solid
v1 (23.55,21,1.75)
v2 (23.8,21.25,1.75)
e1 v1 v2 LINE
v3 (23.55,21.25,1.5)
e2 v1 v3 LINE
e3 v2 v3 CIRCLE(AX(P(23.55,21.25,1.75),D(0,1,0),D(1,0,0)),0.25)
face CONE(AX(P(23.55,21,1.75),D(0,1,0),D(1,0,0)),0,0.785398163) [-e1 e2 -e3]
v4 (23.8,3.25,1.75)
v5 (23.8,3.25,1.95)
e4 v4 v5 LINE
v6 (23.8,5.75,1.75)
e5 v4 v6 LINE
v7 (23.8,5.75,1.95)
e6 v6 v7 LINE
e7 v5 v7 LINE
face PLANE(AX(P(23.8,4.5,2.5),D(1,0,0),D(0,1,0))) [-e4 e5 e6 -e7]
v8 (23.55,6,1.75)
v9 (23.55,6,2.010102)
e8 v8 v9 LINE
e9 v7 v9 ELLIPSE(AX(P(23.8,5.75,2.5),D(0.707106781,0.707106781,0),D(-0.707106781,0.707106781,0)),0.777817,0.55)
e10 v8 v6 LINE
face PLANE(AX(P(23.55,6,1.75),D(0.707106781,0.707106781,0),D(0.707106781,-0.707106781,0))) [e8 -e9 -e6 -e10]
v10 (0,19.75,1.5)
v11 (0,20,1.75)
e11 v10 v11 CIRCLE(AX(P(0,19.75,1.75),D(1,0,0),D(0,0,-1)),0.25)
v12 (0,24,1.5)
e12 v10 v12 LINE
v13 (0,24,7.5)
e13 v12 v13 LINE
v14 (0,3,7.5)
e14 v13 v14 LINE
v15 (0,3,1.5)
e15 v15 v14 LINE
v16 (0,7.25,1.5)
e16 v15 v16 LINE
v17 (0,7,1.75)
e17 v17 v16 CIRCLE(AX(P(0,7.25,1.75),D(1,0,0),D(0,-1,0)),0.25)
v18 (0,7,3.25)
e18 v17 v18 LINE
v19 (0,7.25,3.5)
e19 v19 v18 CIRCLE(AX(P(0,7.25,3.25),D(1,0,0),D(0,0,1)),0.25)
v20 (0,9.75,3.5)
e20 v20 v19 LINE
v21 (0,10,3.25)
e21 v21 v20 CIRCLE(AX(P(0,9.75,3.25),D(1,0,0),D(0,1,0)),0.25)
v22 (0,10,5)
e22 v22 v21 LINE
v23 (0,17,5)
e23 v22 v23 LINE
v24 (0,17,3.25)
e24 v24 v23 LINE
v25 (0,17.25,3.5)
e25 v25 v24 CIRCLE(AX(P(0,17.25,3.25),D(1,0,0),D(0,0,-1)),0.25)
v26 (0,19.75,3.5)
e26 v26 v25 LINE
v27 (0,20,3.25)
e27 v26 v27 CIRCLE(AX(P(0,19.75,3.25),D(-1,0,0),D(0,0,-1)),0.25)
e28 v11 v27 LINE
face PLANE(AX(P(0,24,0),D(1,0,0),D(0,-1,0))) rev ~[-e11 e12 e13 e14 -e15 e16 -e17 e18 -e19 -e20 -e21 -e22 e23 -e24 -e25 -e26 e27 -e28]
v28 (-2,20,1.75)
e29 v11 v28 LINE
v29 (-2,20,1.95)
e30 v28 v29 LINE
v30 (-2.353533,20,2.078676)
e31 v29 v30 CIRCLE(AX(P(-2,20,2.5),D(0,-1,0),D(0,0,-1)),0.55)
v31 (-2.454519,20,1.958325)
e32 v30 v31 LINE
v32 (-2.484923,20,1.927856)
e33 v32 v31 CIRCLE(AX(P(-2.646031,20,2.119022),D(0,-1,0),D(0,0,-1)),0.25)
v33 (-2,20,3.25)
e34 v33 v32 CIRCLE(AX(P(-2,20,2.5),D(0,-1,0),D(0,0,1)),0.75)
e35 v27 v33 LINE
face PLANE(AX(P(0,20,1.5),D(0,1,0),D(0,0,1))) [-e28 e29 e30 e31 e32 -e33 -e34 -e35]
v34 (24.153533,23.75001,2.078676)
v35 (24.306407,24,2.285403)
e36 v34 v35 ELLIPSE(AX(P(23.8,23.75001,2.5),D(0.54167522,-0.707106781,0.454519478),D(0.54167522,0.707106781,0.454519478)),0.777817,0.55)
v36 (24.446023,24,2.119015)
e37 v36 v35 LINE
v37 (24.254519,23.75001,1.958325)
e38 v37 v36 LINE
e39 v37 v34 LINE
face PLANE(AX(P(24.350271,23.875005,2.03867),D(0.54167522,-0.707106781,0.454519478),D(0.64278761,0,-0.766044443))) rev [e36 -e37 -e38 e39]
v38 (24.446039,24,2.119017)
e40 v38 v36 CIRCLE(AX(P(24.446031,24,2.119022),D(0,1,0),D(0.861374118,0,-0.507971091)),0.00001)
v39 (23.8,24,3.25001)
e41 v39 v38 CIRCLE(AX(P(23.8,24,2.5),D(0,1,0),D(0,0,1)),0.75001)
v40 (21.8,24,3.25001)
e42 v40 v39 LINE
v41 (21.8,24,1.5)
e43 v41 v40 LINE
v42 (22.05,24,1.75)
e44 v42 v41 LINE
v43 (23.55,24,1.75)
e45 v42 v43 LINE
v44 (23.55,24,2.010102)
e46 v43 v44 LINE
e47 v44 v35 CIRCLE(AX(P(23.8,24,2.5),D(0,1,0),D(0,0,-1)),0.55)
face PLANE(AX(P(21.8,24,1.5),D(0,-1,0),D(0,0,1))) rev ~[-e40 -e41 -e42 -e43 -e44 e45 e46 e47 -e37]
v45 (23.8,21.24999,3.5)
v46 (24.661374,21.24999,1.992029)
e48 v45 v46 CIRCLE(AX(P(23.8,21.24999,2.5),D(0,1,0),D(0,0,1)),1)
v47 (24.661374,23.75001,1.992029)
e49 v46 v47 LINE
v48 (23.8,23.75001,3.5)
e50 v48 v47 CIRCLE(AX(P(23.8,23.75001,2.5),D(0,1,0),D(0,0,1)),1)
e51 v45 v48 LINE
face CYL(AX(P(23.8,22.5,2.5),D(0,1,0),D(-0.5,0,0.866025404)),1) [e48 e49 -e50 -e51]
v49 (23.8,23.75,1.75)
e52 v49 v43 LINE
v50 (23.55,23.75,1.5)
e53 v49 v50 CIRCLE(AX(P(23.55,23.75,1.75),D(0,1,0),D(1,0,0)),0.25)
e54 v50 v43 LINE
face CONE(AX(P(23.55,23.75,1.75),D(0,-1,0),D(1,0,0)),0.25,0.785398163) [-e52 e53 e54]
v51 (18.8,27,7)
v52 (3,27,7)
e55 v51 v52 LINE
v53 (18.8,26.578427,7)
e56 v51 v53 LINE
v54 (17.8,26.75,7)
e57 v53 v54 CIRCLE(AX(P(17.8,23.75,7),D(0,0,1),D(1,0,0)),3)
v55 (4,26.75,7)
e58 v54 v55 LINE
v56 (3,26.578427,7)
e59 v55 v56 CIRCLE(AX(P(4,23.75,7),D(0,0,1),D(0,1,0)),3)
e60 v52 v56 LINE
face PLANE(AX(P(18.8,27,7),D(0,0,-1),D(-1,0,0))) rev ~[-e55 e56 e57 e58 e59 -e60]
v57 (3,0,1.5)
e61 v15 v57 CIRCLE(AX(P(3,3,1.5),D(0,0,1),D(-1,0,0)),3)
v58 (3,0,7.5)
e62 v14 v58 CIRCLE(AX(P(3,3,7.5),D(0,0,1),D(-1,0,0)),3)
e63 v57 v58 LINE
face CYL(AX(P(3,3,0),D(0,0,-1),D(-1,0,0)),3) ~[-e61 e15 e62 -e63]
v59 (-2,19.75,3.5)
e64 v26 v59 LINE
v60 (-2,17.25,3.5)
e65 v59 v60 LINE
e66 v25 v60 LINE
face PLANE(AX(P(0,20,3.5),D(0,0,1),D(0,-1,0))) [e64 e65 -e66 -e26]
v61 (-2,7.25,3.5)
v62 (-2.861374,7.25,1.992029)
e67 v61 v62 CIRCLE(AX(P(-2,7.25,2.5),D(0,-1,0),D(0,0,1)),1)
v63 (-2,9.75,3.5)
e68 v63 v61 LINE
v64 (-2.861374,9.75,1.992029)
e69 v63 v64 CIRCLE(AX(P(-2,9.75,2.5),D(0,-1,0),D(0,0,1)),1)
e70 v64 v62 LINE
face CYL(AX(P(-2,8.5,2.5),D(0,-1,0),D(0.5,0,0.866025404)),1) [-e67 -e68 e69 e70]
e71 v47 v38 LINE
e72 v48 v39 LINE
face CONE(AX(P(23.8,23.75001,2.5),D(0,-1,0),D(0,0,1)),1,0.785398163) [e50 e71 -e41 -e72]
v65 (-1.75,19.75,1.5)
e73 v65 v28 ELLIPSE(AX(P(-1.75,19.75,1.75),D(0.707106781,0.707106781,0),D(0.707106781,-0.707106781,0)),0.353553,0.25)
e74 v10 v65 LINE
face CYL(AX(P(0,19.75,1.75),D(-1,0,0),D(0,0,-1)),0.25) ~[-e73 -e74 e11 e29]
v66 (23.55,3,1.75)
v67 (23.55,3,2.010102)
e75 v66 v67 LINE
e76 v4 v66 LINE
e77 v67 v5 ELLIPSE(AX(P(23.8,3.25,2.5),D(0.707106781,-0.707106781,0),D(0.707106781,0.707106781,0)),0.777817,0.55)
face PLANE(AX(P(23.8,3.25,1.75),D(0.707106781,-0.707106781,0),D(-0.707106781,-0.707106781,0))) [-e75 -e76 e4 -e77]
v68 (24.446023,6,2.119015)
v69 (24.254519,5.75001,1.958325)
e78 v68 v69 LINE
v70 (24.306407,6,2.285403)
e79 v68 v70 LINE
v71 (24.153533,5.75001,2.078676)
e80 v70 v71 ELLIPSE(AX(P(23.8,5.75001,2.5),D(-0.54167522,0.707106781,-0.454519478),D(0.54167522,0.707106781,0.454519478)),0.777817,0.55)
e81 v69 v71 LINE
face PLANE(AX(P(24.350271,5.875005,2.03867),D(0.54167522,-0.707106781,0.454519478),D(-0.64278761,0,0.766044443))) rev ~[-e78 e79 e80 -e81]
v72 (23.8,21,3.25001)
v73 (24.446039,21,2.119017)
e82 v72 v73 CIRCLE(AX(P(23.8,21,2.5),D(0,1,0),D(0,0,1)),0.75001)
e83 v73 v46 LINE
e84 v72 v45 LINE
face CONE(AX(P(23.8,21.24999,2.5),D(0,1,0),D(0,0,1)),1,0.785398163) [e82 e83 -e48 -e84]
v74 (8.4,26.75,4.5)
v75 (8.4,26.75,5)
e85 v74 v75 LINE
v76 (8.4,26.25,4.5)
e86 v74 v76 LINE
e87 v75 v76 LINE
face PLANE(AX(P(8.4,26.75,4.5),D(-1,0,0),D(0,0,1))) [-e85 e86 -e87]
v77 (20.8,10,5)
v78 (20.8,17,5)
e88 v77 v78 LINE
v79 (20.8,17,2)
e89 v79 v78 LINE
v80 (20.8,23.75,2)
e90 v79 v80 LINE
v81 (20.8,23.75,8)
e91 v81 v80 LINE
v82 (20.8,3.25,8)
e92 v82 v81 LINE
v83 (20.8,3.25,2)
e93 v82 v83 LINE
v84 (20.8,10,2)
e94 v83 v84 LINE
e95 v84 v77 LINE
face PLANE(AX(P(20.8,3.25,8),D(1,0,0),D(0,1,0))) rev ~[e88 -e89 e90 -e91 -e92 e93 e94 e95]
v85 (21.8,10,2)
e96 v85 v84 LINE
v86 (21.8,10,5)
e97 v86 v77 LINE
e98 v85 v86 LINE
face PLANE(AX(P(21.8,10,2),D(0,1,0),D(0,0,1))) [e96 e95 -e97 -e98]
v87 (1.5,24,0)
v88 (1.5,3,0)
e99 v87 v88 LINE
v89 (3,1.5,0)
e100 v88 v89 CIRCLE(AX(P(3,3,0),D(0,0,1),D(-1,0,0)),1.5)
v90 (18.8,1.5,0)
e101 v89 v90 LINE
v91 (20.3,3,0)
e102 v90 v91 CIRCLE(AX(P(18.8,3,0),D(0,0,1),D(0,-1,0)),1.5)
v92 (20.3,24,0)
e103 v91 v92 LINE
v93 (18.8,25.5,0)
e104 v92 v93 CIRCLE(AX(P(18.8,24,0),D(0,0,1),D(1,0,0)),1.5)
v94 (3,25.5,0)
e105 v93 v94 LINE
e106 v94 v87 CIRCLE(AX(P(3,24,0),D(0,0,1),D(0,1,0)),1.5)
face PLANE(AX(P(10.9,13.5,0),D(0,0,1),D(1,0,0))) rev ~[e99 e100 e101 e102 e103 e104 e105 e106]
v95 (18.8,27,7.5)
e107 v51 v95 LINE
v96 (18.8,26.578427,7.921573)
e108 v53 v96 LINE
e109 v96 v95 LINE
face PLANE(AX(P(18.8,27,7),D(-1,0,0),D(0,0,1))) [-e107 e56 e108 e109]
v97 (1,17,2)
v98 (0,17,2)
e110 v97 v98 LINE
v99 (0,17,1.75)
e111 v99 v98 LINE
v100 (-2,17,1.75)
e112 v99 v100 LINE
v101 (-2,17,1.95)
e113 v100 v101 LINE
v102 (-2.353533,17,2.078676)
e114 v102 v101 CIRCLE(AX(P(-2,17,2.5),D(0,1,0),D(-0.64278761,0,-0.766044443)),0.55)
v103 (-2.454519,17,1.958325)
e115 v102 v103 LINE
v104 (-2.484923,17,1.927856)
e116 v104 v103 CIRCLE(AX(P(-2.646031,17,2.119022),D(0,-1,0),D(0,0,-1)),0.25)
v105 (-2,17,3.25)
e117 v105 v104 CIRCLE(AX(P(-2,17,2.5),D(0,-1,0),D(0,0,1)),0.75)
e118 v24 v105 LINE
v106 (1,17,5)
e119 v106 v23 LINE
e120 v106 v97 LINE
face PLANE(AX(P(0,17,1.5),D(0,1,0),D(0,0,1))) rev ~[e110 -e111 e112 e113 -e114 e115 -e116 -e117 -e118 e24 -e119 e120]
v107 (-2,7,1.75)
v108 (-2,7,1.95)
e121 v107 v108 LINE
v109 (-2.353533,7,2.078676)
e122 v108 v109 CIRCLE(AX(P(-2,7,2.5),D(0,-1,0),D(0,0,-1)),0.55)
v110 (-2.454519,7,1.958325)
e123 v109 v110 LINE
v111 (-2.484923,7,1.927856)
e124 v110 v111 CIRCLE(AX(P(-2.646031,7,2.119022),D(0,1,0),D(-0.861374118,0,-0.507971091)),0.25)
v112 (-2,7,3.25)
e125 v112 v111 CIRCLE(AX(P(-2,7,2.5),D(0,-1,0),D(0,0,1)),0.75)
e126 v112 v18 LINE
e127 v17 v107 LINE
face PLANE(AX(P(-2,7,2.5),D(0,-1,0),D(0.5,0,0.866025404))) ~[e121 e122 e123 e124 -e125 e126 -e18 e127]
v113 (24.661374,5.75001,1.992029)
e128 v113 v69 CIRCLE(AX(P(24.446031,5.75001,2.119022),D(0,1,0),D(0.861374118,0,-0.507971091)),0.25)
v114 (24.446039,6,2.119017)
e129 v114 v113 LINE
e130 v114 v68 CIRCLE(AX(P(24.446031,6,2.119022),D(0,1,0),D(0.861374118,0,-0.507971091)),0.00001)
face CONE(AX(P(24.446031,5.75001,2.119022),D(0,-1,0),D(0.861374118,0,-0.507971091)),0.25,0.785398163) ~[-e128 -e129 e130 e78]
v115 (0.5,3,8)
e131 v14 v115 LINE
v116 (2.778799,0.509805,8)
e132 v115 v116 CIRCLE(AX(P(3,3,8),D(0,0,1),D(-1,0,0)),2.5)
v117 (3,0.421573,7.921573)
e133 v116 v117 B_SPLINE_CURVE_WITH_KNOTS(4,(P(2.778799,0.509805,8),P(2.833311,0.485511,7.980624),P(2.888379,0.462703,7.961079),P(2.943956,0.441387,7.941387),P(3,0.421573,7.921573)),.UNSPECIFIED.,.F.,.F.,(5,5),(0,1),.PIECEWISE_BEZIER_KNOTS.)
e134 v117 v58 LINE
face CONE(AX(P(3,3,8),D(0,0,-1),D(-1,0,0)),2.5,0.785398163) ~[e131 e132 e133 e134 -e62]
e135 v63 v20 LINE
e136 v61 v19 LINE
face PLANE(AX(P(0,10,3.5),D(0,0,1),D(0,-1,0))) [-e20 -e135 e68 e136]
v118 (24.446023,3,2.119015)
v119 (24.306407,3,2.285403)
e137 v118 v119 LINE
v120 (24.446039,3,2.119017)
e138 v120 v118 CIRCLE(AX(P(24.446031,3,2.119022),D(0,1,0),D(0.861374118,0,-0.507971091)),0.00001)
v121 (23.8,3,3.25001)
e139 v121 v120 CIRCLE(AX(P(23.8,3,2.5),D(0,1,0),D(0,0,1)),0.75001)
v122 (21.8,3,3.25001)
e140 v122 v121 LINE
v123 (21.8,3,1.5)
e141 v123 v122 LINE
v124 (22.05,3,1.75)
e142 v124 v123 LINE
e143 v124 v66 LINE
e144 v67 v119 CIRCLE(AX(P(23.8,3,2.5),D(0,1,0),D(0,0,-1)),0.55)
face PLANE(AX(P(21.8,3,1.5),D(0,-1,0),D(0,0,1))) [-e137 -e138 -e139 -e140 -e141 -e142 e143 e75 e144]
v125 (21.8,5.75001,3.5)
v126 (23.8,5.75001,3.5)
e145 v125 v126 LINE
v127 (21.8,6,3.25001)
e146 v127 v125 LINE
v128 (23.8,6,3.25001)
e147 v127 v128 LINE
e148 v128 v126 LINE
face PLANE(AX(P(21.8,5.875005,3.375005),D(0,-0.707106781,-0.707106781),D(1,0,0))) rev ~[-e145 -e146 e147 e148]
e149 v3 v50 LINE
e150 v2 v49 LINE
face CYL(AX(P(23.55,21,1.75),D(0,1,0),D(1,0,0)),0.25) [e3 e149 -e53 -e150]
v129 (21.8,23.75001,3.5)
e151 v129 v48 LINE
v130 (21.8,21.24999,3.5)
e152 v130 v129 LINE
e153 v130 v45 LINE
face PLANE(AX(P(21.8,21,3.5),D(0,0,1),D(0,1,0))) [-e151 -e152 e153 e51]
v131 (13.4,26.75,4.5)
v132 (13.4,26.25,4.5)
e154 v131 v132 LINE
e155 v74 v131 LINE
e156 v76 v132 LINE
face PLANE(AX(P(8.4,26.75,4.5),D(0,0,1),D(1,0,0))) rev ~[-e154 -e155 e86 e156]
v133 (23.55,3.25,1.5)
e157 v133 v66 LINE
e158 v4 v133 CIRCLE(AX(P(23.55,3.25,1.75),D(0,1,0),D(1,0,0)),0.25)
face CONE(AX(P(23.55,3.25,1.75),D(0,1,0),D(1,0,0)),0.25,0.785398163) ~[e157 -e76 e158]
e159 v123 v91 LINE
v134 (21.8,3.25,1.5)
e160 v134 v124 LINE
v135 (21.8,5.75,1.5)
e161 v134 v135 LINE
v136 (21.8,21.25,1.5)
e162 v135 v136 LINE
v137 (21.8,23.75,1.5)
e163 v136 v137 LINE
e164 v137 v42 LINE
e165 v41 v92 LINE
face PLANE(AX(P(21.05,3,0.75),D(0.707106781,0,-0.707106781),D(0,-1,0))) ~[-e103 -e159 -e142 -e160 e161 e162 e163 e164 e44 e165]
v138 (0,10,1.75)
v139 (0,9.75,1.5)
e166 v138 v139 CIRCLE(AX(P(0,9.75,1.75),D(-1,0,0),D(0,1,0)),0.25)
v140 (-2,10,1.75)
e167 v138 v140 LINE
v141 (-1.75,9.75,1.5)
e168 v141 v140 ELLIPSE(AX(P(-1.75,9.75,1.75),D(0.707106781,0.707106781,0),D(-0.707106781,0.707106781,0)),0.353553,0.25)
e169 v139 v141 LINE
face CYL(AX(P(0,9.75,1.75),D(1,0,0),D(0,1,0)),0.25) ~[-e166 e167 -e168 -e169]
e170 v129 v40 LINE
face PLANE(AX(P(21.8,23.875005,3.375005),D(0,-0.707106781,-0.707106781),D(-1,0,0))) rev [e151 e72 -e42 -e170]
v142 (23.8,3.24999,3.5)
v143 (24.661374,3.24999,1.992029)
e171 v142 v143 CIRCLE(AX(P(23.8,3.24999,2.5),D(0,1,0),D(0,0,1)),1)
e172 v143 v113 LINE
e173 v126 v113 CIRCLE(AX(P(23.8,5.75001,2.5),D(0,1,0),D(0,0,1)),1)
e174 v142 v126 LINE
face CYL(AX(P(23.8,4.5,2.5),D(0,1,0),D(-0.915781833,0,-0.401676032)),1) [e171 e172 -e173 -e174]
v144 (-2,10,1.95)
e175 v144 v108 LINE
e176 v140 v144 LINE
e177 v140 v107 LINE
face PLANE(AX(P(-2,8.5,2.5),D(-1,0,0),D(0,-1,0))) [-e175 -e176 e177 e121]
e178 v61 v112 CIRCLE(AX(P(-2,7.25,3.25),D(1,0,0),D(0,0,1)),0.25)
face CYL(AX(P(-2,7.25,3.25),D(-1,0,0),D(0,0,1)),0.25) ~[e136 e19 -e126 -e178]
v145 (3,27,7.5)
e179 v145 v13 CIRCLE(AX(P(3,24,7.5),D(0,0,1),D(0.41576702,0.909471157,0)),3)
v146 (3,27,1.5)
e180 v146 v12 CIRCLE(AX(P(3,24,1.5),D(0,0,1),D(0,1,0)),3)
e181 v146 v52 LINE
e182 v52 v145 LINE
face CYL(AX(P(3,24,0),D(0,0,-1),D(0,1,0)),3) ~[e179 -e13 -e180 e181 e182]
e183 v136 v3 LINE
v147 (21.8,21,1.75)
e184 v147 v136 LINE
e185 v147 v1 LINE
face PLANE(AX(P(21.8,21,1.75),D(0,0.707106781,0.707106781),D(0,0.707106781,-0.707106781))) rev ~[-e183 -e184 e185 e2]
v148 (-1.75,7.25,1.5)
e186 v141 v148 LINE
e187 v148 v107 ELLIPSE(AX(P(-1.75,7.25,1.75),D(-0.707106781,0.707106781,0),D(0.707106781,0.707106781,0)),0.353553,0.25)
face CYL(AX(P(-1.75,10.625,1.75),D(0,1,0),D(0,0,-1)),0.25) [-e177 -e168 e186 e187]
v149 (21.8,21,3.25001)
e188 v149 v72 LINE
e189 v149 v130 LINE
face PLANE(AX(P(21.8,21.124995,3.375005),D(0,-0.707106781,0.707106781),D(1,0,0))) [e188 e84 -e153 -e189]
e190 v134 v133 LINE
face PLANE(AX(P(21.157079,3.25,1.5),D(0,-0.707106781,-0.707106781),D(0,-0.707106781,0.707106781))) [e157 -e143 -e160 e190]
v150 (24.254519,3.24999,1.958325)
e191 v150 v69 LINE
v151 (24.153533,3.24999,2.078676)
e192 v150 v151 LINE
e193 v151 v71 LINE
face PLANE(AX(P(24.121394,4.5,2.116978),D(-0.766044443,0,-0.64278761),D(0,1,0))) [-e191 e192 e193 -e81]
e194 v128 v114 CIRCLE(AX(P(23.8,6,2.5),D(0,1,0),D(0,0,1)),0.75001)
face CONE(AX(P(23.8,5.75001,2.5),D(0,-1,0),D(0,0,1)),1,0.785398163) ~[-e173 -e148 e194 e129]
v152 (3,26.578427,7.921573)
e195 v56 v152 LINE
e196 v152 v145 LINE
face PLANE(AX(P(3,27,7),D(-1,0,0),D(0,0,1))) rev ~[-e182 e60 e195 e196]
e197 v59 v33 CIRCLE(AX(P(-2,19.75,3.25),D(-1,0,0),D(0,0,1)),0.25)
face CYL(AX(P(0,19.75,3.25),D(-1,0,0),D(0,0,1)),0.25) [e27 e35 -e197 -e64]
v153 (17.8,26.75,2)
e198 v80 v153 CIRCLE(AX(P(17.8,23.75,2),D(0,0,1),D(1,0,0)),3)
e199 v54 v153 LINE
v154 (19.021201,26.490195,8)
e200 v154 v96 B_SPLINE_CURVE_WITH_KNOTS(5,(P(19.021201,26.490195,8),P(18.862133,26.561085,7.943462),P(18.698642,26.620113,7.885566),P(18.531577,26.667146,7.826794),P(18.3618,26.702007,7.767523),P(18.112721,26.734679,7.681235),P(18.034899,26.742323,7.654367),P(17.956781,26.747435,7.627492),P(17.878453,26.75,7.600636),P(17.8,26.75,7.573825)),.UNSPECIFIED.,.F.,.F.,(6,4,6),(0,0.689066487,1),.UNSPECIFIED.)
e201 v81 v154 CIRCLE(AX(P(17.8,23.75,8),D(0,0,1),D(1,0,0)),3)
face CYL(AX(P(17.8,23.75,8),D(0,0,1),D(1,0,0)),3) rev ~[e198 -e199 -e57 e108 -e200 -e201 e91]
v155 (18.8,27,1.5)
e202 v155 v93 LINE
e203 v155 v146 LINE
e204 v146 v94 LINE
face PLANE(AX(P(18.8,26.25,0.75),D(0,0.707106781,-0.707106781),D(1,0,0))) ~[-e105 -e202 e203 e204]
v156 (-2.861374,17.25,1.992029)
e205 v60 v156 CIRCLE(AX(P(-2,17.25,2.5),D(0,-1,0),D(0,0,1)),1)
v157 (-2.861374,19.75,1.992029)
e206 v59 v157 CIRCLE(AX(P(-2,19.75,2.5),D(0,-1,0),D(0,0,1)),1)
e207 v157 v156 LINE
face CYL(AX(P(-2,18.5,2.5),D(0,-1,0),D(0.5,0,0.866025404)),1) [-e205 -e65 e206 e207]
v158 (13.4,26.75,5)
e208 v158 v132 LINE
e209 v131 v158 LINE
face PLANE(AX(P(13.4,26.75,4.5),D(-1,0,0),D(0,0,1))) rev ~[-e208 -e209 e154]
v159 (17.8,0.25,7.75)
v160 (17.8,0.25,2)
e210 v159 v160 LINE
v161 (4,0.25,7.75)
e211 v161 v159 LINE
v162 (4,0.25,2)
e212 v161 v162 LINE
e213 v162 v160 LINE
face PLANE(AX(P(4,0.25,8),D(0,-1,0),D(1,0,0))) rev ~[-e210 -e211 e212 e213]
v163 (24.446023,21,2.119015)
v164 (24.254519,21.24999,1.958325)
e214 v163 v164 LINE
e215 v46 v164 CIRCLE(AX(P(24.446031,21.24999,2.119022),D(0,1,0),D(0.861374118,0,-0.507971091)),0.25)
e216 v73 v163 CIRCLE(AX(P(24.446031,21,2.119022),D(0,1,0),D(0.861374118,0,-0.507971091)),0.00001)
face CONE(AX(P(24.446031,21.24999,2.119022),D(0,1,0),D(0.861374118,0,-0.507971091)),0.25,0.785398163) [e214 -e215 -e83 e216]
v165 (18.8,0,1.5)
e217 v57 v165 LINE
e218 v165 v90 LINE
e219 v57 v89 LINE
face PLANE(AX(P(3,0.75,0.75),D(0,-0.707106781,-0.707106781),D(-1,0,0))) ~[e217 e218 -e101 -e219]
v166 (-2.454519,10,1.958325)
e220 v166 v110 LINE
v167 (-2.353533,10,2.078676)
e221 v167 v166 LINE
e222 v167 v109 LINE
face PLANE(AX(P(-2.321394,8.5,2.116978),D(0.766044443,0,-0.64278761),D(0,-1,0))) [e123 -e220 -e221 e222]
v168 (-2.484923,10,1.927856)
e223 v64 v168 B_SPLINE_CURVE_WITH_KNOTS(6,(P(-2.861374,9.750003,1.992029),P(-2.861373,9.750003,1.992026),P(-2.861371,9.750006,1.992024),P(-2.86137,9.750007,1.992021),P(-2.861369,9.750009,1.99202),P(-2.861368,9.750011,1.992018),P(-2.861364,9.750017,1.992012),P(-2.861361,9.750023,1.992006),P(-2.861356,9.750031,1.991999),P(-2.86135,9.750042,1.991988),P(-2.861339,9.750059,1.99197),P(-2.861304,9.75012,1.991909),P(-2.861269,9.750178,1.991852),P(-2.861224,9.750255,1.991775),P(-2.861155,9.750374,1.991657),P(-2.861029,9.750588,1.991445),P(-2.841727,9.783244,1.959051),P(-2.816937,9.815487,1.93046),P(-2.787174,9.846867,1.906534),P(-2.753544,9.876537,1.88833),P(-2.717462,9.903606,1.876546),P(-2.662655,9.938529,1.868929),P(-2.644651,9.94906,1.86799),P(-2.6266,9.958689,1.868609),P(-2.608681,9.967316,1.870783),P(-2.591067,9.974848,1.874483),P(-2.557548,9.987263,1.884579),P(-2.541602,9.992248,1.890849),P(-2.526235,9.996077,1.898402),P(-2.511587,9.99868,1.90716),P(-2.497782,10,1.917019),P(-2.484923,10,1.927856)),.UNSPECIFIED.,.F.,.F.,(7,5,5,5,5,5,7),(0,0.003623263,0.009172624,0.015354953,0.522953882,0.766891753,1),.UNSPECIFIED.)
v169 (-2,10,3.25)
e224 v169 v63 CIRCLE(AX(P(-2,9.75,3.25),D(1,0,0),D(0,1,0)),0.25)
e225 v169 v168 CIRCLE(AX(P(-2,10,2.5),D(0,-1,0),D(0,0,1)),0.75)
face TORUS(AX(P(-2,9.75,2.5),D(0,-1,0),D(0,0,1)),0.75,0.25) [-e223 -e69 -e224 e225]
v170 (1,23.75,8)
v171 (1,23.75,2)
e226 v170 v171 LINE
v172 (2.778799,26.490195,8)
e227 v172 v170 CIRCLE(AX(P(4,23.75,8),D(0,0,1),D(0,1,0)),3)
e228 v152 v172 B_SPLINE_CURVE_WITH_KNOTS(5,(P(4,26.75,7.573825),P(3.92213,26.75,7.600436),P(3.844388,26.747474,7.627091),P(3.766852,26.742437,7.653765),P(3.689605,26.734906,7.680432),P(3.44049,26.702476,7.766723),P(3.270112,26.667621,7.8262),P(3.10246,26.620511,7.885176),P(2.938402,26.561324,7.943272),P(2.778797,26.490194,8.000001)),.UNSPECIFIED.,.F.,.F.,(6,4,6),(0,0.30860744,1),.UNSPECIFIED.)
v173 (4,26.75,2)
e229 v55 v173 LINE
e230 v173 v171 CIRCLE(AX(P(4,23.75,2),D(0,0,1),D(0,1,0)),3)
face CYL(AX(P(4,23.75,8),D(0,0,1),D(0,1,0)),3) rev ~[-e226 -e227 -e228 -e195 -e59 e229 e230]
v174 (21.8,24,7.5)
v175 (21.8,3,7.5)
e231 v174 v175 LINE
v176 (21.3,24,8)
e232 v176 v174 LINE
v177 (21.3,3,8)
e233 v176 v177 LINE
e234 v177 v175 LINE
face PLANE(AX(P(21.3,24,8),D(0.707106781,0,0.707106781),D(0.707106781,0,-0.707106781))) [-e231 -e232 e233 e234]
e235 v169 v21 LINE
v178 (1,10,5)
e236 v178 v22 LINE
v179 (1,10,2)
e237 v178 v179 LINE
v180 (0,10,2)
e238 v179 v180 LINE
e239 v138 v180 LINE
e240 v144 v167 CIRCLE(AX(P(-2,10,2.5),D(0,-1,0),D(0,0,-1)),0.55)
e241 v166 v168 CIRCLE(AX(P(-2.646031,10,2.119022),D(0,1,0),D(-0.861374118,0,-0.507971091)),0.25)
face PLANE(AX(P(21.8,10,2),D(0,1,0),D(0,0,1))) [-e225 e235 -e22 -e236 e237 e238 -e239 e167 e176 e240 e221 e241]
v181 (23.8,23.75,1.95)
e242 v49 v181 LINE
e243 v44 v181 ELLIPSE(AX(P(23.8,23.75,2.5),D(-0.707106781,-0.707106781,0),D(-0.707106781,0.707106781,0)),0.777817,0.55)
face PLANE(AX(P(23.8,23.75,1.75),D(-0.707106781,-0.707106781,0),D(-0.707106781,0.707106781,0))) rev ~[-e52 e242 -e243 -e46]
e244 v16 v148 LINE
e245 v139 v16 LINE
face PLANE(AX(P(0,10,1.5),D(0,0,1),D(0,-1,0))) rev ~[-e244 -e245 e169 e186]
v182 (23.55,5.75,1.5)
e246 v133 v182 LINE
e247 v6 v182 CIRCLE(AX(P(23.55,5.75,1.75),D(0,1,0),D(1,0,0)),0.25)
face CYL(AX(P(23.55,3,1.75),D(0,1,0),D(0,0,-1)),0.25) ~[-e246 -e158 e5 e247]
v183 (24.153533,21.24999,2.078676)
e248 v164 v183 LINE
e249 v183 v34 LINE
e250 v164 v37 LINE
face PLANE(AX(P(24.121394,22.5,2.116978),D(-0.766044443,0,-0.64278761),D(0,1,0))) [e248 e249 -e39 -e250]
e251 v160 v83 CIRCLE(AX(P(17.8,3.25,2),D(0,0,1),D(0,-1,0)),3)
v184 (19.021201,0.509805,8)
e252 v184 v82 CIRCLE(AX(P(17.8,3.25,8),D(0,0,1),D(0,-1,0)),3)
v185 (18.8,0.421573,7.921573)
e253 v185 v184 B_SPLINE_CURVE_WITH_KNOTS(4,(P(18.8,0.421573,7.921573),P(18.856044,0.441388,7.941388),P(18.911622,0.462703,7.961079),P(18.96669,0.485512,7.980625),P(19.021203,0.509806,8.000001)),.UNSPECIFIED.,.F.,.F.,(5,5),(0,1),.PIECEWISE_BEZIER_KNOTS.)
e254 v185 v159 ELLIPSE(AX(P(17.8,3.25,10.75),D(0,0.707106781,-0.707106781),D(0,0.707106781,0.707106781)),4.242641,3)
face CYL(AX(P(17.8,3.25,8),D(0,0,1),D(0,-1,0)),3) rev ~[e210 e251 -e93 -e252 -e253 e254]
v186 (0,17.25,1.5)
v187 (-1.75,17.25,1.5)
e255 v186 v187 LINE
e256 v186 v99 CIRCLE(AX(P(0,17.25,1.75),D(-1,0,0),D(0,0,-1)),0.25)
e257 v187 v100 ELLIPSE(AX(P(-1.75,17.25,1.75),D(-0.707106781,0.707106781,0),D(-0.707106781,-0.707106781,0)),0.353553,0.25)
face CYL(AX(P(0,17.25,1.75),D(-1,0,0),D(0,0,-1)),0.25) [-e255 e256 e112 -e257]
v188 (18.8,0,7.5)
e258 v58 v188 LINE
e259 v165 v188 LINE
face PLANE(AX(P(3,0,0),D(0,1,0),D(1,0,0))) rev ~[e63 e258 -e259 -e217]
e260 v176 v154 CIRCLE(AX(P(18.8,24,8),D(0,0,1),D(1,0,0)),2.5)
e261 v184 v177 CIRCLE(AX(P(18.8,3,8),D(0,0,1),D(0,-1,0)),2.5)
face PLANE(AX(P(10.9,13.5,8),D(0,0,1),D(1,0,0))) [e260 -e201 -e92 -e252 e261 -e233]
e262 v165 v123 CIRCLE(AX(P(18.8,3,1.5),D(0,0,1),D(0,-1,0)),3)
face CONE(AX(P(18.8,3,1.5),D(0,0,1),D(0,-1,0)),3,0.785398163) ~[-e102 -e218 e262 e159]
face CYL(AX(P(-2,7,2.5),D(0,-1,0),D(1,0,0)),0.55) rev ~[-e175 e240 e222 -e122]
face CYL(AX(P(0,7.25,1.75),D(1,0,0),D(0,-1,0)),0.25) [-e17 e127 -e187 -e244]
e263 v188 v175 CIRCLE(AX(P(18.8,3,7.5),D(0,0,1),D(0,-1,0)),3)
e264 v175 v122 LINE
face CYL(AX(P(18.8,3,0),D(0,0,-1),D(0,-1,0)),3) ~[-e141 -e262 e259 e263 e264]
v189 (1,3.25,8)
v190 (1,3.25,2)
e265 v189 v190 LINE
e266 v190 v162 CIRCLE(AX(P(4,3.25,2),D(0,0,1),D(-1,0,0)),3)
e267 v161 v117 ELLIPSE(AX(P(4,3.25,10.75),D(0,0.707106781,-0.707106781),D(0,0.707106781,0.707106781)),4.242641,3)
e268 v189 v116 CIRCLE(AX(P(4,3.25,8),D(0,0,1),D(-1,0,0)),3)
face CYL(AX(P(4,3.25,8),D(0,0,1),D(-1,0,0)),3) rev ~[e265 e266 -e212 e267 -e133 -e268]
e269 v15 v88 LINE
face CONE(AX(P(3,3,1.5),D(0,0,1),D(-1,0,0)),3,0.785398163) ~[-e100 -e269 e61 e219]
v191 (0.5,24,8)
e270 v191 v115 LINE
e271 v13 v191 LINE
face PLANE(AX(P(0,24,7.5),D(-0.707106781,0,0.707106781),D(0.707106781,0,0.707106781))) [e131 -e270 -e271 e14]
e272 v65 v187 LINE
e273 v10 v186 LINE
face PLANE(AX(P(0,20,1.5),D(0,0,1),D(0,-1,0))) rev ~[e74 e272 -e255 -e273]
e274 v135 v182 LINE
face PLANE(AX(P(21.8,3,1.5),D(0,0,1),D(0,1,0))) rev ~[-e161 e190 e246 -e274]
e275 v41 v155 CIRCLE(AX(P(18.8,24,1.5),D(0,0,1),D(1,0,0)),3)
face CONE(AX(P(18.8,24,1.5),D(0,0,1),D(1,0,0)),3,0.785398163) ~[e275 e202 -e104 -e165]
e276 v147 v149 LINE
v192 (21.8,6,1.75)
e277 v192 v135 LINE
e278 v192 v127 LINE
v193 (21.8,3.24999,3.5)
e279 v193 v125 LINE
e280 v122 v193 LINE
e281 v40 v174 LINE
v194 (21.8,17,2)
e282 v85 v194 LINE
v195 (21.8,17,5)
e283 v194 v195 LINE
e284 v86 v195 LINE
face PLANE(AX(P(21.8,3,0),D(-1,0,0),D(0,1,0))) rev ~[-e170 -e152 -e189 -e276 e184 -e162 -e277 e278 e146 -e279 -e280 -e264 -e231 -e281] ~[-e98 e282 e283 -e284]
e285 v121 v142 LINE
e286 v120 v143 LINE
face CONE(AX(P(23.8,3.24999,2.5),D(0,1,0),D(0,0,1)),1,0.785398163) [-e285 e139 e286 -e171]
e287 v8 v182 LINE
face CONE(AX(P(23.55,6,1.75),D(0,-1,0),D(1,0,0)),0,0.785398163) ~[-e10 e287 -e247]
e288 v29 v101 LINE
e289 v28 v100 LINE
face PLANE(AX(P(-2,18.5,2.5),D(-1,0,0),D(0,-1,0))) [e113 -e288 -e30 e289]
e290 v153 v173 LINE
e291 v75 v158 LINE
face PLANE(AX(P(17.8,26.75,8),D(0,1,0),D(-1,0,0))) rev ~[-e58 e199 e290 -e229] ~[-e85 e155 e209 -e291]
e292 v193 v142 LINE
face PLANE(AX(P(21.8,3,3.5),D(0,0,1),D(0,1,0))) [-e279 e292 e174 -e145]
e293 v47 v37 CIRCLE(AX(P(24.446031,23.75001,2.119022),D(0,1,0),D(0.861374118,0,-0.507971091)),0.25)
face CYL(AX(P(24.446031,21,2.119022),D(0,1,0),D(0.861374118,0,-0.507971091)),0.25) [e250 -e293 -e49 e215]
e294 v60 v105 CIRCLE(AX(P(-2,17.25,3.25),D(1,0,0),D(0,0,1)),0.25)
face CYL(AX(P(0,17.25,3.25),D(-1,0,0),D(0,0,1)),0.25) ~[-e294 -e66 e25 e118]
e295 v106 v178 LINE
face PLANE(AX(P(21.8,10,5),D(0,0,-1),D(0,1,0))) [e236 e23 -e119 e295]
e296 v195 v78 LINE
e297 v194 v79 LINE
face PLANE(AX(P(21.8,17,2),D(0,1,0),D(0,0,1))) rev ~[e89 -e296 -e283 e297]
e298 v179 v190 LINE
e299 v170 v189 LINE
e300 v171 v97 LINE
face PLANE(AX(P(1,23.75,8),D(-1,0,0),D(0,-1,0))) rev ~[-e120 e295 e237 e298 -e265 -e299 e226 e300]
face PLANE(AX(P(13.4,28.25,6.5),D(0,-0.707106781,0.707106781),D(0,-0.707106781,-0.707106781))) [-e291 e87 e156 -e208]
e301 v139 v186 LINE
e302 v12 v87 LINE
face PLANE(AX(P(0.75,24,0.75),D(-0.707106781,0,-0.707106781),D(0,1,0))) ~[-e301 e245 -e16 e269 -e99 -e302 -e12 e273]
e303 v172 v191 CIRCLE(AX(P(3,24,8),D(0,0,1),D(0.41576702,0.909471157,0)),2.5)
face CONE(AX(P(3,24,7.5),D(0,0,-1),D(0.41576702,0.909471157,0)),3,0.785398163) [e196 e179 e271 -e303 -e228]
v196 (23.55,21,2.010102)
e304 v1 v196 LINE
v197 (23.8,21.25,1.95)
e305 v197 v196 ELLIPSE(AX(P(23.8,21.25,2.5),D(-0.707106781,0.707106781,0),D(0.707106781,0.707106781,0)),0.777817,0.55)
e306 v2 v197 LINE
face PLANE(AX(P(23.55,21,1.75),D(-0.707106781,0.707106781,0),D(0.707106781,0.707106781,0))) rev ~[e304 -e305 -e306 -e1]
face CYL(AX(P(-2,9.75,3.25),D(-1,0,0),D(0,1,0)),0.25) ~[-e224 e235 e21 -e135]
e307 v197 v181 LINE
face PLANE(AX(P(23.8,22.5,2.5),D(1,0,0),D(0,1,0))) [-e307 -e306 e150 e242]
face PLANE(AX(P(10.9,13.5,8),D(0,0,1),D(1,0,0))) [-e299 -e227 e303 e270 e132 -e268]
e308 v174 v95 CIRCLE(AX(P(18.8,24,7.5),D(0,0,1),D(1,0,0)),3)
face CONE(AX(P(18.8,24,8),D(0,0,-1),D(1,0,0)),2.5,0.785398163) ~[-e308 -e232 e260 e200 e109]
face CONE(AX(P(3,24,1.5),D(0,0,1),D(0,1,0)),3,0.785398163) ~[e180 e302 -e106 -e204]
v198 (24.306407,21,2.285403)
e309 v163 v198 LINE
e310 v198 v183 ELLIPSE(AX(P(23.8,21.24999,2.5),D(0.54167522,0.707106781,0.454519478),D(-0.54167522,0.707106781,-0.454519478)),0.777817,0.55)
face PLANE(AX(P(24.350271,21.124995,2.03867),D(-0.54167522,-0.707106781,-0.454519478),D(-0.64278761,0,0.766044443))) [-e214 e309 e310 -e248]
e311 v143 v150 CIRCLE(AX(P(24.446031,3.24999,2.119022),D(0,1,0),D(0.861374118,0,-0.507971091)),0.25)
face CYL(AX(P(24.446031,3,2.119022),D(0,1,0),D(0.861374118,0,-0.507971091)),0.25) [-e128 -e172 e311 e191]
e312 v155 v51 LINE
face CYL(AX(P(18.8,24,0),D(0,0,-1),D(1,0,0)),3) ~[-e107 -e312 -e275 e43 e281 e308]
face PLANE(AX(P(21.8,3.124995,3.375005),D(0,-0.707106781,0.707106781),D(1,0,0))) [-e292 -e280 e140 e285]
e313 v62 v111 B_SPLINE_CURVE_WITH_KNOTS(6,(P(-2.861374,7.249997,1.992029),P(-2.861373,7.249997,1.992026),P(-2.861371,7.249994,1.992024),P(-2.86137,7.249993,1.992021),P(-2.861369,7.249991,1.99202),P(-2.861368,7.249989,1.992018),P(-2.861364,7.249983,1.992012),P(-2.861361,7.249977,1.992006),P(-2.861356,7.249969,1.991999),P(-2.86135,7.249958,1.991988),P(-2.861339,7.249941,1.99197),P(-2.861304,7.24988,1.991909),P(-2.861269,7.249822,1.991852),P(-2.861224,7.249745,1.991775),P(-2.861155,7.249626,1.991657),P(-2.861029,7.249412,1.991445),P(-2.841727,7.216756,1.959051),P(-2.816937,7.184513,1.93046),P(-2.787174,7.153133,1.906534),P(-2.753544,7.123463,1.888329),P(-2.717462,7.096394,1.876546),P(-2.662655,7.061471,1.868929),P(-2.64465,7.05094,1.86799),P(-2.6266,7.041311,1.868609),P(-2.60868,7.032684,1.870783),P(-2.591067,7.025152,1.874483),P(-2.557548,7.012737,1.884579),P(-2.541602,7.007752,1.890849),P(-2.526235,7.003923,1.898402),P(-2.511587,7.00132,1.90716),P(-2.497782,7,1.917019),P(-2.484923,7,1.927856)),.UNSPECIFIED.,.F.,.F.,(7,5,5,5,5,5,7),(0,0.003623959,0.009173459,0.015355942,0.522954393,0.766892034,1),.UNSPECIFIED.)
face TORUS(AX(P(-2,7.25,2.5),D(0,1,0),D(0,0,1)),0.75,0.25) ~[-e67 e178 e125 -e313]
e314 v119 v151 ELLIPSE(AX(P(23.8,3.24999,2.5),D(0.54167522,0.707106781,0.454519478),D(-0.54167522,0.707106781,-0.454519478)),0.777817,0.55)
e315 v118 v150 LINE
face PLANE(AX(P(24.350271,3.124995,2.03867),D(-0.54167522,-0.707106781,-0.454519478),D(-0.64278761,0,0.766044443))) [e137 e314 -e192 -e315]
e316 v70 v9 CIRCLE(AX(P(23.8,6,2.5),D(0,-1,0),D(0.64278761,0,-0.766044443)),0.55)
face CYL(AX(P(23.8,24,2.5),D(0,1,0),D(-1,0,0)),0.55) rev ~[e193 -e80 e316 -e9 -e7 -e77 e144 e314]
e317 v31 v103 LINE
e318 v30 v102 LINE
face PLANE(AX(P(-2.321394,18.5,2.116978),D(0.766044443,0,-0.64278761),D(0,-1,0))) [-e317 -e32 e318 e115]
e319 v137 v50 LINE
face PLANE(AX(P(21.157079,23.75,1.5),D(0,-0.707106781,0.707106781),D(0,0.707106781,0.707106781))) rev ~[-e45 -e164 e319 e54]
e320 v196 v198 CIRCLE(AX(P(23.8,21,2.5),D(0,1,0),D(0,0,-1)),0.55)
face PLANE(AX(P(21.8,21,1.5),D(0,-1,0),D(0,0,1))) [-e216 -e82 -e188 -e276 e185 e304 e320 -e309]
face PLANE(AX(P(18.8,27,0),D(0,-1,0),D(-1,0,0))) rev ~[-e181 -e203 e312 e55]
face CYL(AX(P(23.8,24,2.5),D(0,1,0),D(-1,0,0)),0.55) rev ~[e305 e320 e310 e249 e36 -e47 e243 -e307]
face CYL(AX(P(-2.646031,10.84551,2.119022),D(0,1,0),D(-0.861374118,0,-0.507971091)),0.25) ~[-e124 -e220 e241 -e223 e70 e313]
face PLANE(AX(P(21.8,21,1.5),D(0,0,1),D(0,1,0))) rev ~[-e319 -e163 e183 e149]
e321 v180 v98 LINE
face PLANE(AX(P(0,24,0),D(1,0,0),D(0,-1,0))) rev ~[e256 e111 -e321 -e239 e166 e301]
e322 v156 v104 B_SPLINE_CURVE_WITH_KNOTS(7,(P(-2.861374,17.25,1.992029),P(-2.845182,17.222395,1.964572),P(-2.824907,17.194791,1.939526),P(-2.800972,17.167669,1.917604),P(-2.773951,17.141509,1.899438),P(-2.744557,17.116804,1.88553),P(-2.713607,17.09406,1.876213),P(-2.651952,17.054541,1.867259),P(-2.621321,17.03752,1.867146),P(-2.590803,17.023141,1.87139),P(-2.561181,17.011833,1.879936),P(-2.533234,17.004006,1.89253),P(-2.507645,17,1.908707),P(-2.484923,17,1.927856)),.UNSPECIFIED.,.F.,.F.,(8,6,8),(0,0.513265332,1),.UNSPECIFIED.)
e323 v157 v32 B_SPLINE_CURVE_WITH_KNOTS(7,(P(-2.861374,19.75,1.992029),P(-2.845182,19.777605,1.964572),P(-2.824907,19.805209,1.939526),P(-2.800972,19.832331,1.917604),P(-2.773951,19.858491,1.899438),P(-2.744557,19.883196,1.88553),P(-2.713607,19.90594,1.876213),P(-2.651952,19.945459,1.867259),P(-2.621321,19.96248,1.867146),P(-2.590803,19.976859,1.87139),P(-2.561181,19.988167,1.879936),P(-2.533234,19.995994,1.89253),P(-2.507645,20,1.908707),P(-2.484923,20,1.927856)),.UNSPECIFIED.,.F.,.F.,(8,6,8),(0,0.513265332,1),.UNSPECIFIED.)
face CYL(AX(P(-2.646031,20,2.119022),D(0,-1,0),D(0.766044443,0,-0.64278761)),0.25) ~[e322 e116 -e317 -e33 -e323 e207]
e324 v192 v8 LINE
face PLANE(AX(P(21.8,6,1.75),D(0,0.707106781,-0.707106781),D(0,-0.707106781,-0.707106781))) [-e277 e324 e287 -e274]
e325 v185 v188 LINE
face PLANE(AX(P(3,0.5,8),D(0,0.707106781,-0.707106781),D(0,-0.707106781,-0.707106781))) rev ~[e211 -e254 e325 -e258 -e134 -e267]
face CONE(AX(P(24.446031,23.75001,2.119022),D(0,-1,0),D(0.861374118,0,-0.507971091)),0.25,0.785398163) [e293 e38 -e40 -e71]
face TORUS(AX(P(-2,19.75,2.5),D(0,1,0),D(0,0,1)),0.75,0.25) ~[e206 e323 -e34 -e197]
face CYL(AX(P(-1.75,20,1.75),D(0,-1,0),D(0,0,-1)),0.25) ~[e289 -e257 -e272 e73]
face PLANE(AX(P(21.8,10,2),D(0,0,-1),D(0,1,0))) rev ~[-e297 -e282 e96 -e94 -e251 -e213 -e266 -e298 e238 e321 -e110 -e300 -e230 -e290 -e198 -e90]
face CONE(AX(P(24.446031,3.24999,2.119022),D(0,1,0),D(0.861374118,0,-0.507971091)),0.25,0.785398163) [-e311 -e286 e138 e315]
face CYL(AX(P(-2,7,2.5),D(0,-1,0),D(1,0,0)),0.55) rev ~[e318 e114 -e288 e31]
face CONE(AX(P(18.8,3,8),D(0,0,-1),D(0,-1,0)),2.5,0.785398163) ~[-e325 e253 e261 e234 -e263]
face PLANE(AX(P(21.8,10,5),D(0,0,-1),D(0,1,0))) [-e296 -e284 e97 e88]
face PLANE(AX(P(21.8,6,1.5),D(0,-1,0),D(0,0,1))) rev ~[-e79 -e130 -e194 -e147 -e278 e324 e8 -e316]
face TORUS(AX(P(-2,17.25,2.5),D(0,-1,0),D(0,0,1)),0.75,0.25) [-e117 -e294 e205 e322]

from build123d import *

# Parameters (mm, degrees)
F1_DEPTH       = 8
F3_DEPTH       = 6
F4_W           = 7
F4_H           = 3
F5_DEPTH       = 21.8
F6_W           = 15.8
F6_H           = 1
F7_DEPTH       = 3
F8_SIZE        = 1.5
F9_T1_DEPTH    = 21
F9_T3_DEPTH    = 15.8
F9_T6_ANGLE    = 114.5676286299
F9_T8_ANGLE    = 114.5676286299
F9_T10_ANGLE   = 90
F9_T12_ANGLE   = 90
F10_W          = 5
F10_H          = 2
F11_DEPTH      = 0.5
F12_T4_DEPTH   = 5
F13_W          = 3
F13_H          = 2
F14_DEPTH      = 2
F15_W          = 3
F15_H          = 1
F16_ANGLE_BACK = 113.6829972449
F16_ANGLE      = 253.6829972449
F17_W          = 3
F17_H          = 1
F18_ANGLE_BACK = 30
F18_ANGLE      = 170
F19_R          = 0.55
F20_DEPTH      = 24.0010001
F21_R          = 0.25
F22_R          = 0.25
F23_T1_DEPTH   = 1.75
F23_T3_DEPTH   = 0.842920747
F23_T8_DEPTH   = 2.392920747
F23_T13_DEPTH  = 2.392920747
F23_T16_ANGLE  = 90
F23_T18_ANGLE  = 90
F23_T20_ANGLE  = 90
F23_T22_ANGLE  = 90
F24_SIZE       = 0.24999
F25_W          = 3
F25_H          = 2
F26_DEPTH      = 2
F27_W          = 3
F27_H          = 1
F28_ANGLE_BACK = 30
F28_ANGLE      = 170
F29_W          = 3
F29_H          = 1
F30_ANGLE_BACK = 30
F30_ANGLE      = 170
F31_R          = 0.55
F32_DEPTH      = 20.0010001
F33_R          = 0.25
F34_T1_DEPTH   = 4.6910197873
F34_T3_DEPTH   = 2
F34_T5_DEPTH   = 4.25
F34_T10_DEPTH  = 2.625
F34_T15_DEPTH  = 2.625
F34_T18_ANGLE  = 175.8446845197
F34_T22_DEPTH  = 2.625
F34_T27_DEPTH  = 2.625
F34_T30_ANGLE  = 175.8446845197


# Not quite as in the source:
# - a fillet or chamfer that OpenCascade refuses, or shapes differently, is made with other operations: its cross-section is extruded or revolved along the edge and cut away or added
# - a fillet or chamfer is up to 0.001 mm smaller than in the source, because OpenCascade refuses the exact size


with BuildPart() as f1:
    # F0 (on Top) → F1 (new body)
    with BuildSketch(Plane.XY):
        with BuildLine():
            ThreePointArc((0, 3), (0.8786796564, 0.8786796564), (3, 0))
            Line((3, 0), (18.8, 0))
            ThreePointArc((18.8, 0), (20.9213203436, 0.8786796564), (21.8, 3))
            Line((21.8, 3), (21.8, 24))
            ThreePointArc((21.8, 24), (20.9213203436, 26.1213203436), (18.8, 27))
            Line((18.8, 27), (3, 27))
            ThreePointArc((3, 27), (0.8786796564, 26.1213203436), (0, 24))
            Line((0, 24), (0, 3))
        make_face()
    extrude(amount=F1_DEPTH)

    # F2 (on face) → F3 (cut)
    with BuildSketch(Plane.XY.offset(8)):
        with BuildLine():
            Line((17.8, 26.75), (4, 26.75))
            ThreePointArc((4, 26.75), (1.8786796564, 25.8713203436), (1, 23.75))
            Line((1, 23.75), (1, 3.25))
            ThreePointArc((1, 3.25), (1.8786796564, 1.1286796564), (4, 0.25))
            Line((4, 0.25), (17.8, 0.25))
            ThreePointArc((17.8, 0.25), (19.9213203436, 1.1286796564), (20.8, 3.25))
            Line((20.8, 3.25), (20.8, 23.75))
            ThreePointArc((20.8, 23.75), (19.9213203436, 25.8713203436), (17.8, 26.75))
        make_face()
    extrude(amount=-F3_DEPTH, mode=Mode.SUBTRACT)

    # F4 (on face) → F5 (cut)
    with BuildSketch(Plane.YZ.offset(21.8)):
        with Locations((13.5, 3.5)):
            Rectangle(F4_W, F4_H)
    extrude(amount=-F5_DEPTH, mode=Mode.SUBTRACT)

    # F6 (on face) → F7 (cut)
    with BuildSketch(Plane(origin=(0, 27, 0), x_dir=(-1, 0, 0), z_dir=(0, 1, 0))):
        with Locations((-10.9, 7.5)):
            Rectangle(F6_W, F6_H)
    extrude(amount=-F7_DEPTH, mode=Mode.SUBTRACT)

    # F8
    f8_edges = [f1.edges().sort_by_distance(p)[0] for p in [
        (0, 13.5, 0),
        (0.87868, 26.12132, 0),
        (0.87868, 0.87868, 0),
        (10.9, 0, 0),
        (20.92132, 0.87868, 0),
        (21.8, 13.5, 0),
        (20.92132, 26.12132, 0),
        (10.9, 27, 0),
    ]]
    chamfer(f8_edges, length=F8_SIZE)

    # F9: chamfer of 0.5 on 6 edges, made by hand

    # F9_s2 → F9_t1 (cut)
    with BuildSketch(Plane.XZ.offset(-24)):
        Polygon((0, 7.5), (0.5, 8), (0, 8), align=None)
        Polygon((21.3, 8), (21.8, 7.5), (21.8, 8), align=None)
    extrude(amount=F9_T1_DEPTH, mode=Mode.SUBTRACT)

    # F9_s4 → F9_t3 (cut)
    with BuildSketch(Plane.YZ.offset(3)):
        Polygon((0.5, 8), (0, 7.5), (0, 8), align=None)
    extrude(amount=F9_T3_DEPTH, mode=Mode.SUBTRACT)

    # F9_s5 → F9_t6 (revolve, cut)
    with BuildSketch(Plane(origin=(-6.5936613339, 3.0143088072, 0), x_dir=(0, 0, 1), z_dir=(0.9094711571, -0.4157670193, 0))):
        Polygon((7.5, -26.0746088294), (8, -25.5746088294), (8, -26.0746088294), align=None)
    revolve(axis=Axis((3, 24, 8), (0, 0, 1)), revolution_arc=F9_T6_ANGLE, mode=Mode.SUBTRACT)

    # F9_s7 → F9_t8 (revolve, cut)
    with BuildSketch(Plane.XZ.offset(-24)):
        Polygon((21.3, 8), (21.8, 7.5), (21.8, 8), align=None)
    revolve(axis=Axis((18.8, 24, 8), (0, 0, 1)), revolution_arc=F9_T8_ANGLE, mode=Mode.SUBTRACT)

    # F9_s9 → F9_t10 (revolve, cut)
    with BuildSketch(Plane.YZ.offset(18.8)):
        Polygon((0.5, 8), (0, 7.5), (0, 8), align=None)
    revolve(axis=Axis((18.8, 3, 8), (0, 0, 1)), revolution_arc=F9_T10_ANGLE, mode=Mode.SUBTRACT)

    # F9_s11 → F9_t12 (revolve, cut)
    with BuildSketch(Plane.XZ.offset(-3)):
        Polygon((0.5, 8), (0, 7.5), (0, 8), align=None)
    revolve(axis=Axis((3, 3, 8), (0, 0, 1)), revolution_arc=F9_T12_ANGLE, mode=Mode.SUBTRACT)

    # F10 (on face) → F11 (join)
    with BuildSketch(Plane.XZ.offset(-26.75)):
        with Locations((10.9, 5.5)):
            Rectangle(F10_W, F10_H)
    extrude(amount=F11_DEPTH)

    # F12: chamfer of 2 on 1 edges, made by hand


with BuildPart() as f12_tool2:
    # F12_s3 → F12_t4 (new body)
    with BuildSketch(Plane.YZ.offset(13.4)):
        Polygon((28.25, 6.5), (26.25, 4.5), (26.25, 6.5), align=None)
    extrude(amount=-F12_T4_DEPTH)

    split(bisect_by=Plane.XZ.offset(-26.75), keep=Keep.TOP)


with BuildPart() as f1_1:
    add(f1.part)

    # F12_t1: cut F12_tool2
    add(f12_tool2.part, mode=Mode.SUBTRACT)

    # F13 (on face) → F14 (join)
    with BuildSketch(Plane.YZ.offset(21.8)):
        with Locations((4.5, 2.5)):
            Rectangle(F13_W, F13_H)
        with Locations((22.5, 2.5)):
            Rectangle(F13_W, F13_H)
    extrude(amount=F14_DEPTH)

    # F15 (on face) → F16 (revolve)
    with BuildSketch(Plane.YZ.offset(23.8), mode=Mode.PRIVATE) as f16_sk:
        with Locations((4.5, 3)):
            Rectangle(F15_W, F15_H)
    revolve(f16_sk.sketch.rotate(Axis((23.8, 4.5, 2.5), (0, 1, 0)), -F16_ANGLE_BACK), axis=Axis((23.8, 4.5, 2.5), (0, 1, 0)), revolution_arc=F16_ANGLE)

    # F17 (on face) → F18 (revolve)
    with BuildSketch(Plane.YZ.offset(23.8), mode=Mode.PRIVATE) as f18_sk:
        with Locations((22.5, 3)):
            Rectangle(F17_W, F17_H)
    revolve(f18_sk.sketch.rotate(Axis((23.8, 22.5, 2.5), (0, 1, 0)), -F18_ANGLE_BACK), axis=Axis((23.8, 22.5, 2.5), (0, 1, 0)), revolution_arc=F18_ANGLE)

    # F19 (on face) → F20 (cut, through all)
    with BuildSketch(Plane(origin=(0, 24, 0), x_dir=(-1, 0, 0), z_dir=(0, 1, 0))):
        with Locations((-23.8, 2.5)):
            Circle(F19_R)
    extrude(amount=-F20_DEPTH, mode=Mode.SUBTRACT)

    # F21
    f21_edges = [f1_1.edges().sort_by_distance(p)[0] for p in [
        (23.8, 4.5, 1.5),
        (23.8, 22.5, 1.5),
    ]]
    fillet(f21_edges, radius=F21_R)

    # F22
    f22_edges = [f1_1.edges().sort_by_distance(p)[0] for p in [
        (24.442788, 4.5, 1.733956),
        (24.442788, 22.5, 1.733956),
    ]]
    fillet(f22_edges, radius=F22_R)

    # F23: chamfer of 0.25 on 4 edges, made by hand

    # F23_s2 → F23_t1 (cut)
    with BuildSketch(Plane.YZ.offset(21.8)):
        Polygon((21, 1.75), (21.25, 1.5), (21, 1.5), align=None)
        Polygon((6, 1.75), (5.75, 1.5), (6, 1.5), align=None)
    extrude(amount=F23_T1_DEPTH, mode=Mode.SUBTRACT)

    # F23_s4 → F23_t3 (cut)
    with BuildSketch(Plane.XY.offset(1.75)):
        Polygon((23.8, 23.75), (23.55, 24), (23.8, 24), align=None)
        Polygon((23.8, 3.25), (23.55, 3), (23.8, 3), align=None)
        Polygon((23.55, 6), (23.8, 5.75), (23.8, 6), align=None)
        Polygon((23.55, 21), (23.8, 21.25), (23.8, 21), align=None)
    extrude(amount=F23_T3_DEPTH, mode=Mode.SUBTRACT)


with BuildPart() as f23_tool6:
    # F23_s7 → F23_t8 (new body)
    with BuildSketch(Plane.YZ.offset(21.157079253)):
        Polygon((3.25, 1.5), (3, 1.75), (3, 1.5), align=None)
    extrude(amount=F23_T8_DEPTH)

    split(bisect_by=Plane(origin=(10.15, 0, -10.15), x_dir=(0, 1, 0), z_dir=(0.7071067812, 0, -0.7071067812)), keep=Keep.TOP)


with BuildPart() as f1_2:
    add(f1_1.part)

    # F23_t5: cut F23_tool6
    add(f23_tool6.part, mode=Mode.SUBTRACT)


with BuildPart() as f23_tool11:
    # F23_s12 → F23_t13 (new body)
    with BuildSketch(Plane.YZ.offset(21.157079253)):
        Polygon((23.75, 1.5), (24, 1.75), (24, 1.5), align=None)
    extrude(amount=F23_T13_DEPTH)

    split(bisect_by=Plane(origin=(10.15, 0, -10.15), x_dir=(0, 1, 0), z_dir=(0.7071067812, 0, -0.7071067812)), keep=Keep.TOP)


with BuildPart() as f1_3:
    add(f1_2.part)

    # F23_t10: cut F23_tool11
    add(f23_tool11.part, mode=Mode.SUBTRACT)

    # F23_s15 → F23_t16 (revolve, cut)
    with BuildSketch(Plane.XY.offset(1.75)):
        Polygon((23.8, 23.75), (23.55, 24), (23.8, 24), align=None)
    revolve(axis=Axis((23.55, 24, 1.75), (0, 1, 0)), revolution_arc=F23_T16_ANGLE, mode=Mode.SUBTRACT)

    # F23_s17 → F23_t18 (revolve, cut)
    with BuildSketch(Plane.XY.offset(1.75)):
        Polygon((23.8, 3.25), (23.55, 3), (23.8, 3), align=None)
    revolve(axis=Axis((23.55, 3, 1.75), (0, 1, 0)), revolution_arc=F23_T18_ANGLE, mode=Mode.SUBTRACT)

    # F23_s19 → F23_t20 (revolve, cut)
    with BuildSketch(Plane.XY.offset(1.75)):
        Polygon((23.55, 6), (23.8, 5.75), (23.8, 6), align=None)
    revolve(axis=Axis((23.55, 6, 1.75), (0, 1, 0)), revolution_arc=F23_T20_ANGLE, mode=Mode.SUBTRACT)

    # F23_s21 → F23_t22 (revolve, cut)
    with BuildSketch(Plane.XY.offset(1.75)):
        Polygon((23.55, 21), (23.8, 21.25), (23.8, 21), align=None)
    revolve(axis=Axis((23.55, 21, 1.75), (0, 1, 0)), revolution_arc=F23_T22_ANGLE, mode=Mode.SUBTRACT)

    # F24 (size 0.25 in the source; OpenCascade refuses exactly that, so slightly less here)
    f24_edges = [f1_3.edges().sort_by_distance(p)[0] for p in [
        (22.8, 21, 3.5),
        (24.668323, 21, 2.995998),
        (22.8, 24, 3.5),
        (22.8, 6, 3.5),
        (24.668323, 3, 2.995998),
        (22.8, 3, 3.5),
        (24.668323, 6, 2.995998),
        (24.668323, 24, 2.995998),
        (24.46667, 6, 1.869875),
        (24.204026, 6, 2.0185),
        (24.46667, 3, 1.869875),
        (24.204026, 3, 2.0185),
        (24.46667, 21, 1.869875),
        (24.204026, 21, 2.0185),
        (24.204026, 24, 2.0185),
        (24.46667, 24, 1.869875),
    ]]
    chamfer(f24_edges, length=F24_SIZE)

    # F25 (on face) → F26 (join)
    with BuildSketch(Plane(origin=(0, 0, 0), x_dir=(0, -1, 0), z_dir=(-1, 0, 0))):
        with Locations((-18.5, 2.5)):
            Rectangle(F25_W, F25_H)
        with Locations((-8.5, 2.5)):
            Rectangle(F25_W, F25_H)
    extrude(amount=F26_DEPTH)

    # F27 (on face) → F28 (revolve)
    with BuildSketch(Plane(origin=(-2, 0, 0), x_dir=(0, -1, 0), z_dir=(-1, 0, 0)), mode=Mode.PRIVATE) as f28_sk:
        with Locations((-18.5, 3)):
            Rectangle(F27_W, F27_H)
    revolve(f28_sk.sketch.rotate(Axis((-2, 18.5, 2.5), (0, -1, 0)), -F28_ANGLE_BACK), axis=Axis((-2, 18.5, 2.5), (0, -1, 0)), revolution_arc=F28_ANGLE)

    # F29 (on face) → F30 (revolve)
    with BuildSketch(Plane(origin=(-2, 0, 0), x_dir=(0, -1, 0), z_dir=(-1, 0, 0)), mode=Mode.PRIVATE) as f30_sk:
        with Locations((-8.5, 3)):
            Rectangle(F29_W, F29_H)
    revolve(f30_sk.sketch.rotate(Axis((-2, 8.5, 2.5), (0, -1, 0)), -F30_ANGLE_BACK), axis=Axis((-2, 8.5, 2.5), (0, -1, 0)), revolution_arc=F30_ANGLE)

    # F31 (on face) → F32 (cut, through all)
    with BuildSketch(Plane.XZ.offset(-7)):
        with Locations((-2, 2.5)):
            Circle(F31_R)
    extrude(amount=-F32_DEPTH, mode=Mode.SUBTRACT)

    # F33
    f33_edges = [f1_3.edges().sort_by_distance(p)[0] for p in [
        (-2.642788, 18.5, 1.733956),
        (-2.939693, 17, 2.84202),
        (-2, 18.5, 1.5),
        (-1, 20, 1.5),
        (-1, 17, 1.5),
        (-1, 20, 3.5),
        (-1, 17, 3.5),
        (-2.939693, 20, 2.84202),
    ]]
    fillet(f33_edges, radius=F33_R)

    # F34: fillet of radius 0.25 on 8 edges, made by hand

    # F34_s2 → F34_t1 (cut)
    with BuildSketch(Plane.XZ.offset(-10.8455098936)):
        with BuildLine():
            ThreePointArc((-2.8613741179, 1.9920289093), (-2.6666700685, 1.869875115), (-2.4545194777, 1.9583247796))
            Line((-2.4545194777, 1.9583247796), (-2.6427876097, 1.7339555569))
            ThreePointArc((-2.6427876097, 1.7339555569), (-2.7630701734, 1.8536843569), (-2.8613741179, 1.9920289093))
        make_face()
    extrude(amount=F34_T1_DEPTH, mode=Mode.SUBTRACT)

    # F34_s4 → F34_t3 (cut)
    with BuildSketch(Plane.YZ.offset(-2)):
        with BuildLine():
            ThreePointArc((7.25, 3.5), (7.0732233047, 3.4267766953), (7, 3.25))
            Line((7, 3.25), (7, 3.5))
            Line((7, 3.5), (7.25, 3.5))
        make_face()
        with BuildLine():
            ThreePointArc((10, 3.25), (9.9267766953, 3.4267766953), (9.75, 3.5))
            Line((9.75, 3.5), (10, 3.5))
            Line((10, 3.5), (10, 3.25))
        make_face()
    extrude(amount=F34_T3_DEPTH, mode=Mode.SUBTRACT)

    # F34_s6 → F34_t5 (cut)
    with BuildSketch(Plane.XZ.offset(-10.625)):
        with BuildLine():
            ThreePointArc((-1.75, 1.5), (-1.9267766953, 1.5732233047), (-2, 1.75))
            Line((-2, 1.75), (-2, 1.5))
            Line((-2, 1.5), (-1.75, 1.5))
        make_face()
    extrude(amount=F34_T5_DEPTH, mode=Mode.SUBTRACT)


with BuildPart() as f34_tool8:
    # F34_s9 → F34_t10 (new body)
    with BuildSketch(Plane.YZ):
        with BuildLine():
            ThreePointArc((10, 1.75), (9.9267766953, 1.5732233047), (9.75, 1.5))
            Line((9.75, 1.5), (10, 1.5))
            Line((10, 1.5), (10, 1.75))
        make_face()
    extrude(amount=-F34_T10_DEPTH)

    split(bisect_by=Plane(origin=(0.75, 0, 0.75), x_dir=(0, 1, 0), z_dir=(0.7071067812, 0, 0.7071067812)), keep=Keep.TOP)


with BuildPart() as f1_4:
    add(f1_3.part)

    # F34_t7: cut F34_tool8
    add(f34_tool8.part, mode=Mode.SUBTRACT)


with BuildPart() as f34_tool13:
    # F34_s14 → F34_t15 (new body)
    with BuildSketch(Plane.YZ):
        with BuildLine():
            ThreePointArc((10, 1.75), (9.9267766953, 1.5732233047), (9.75, 1.5))
            Line((9.75, 1.5), (10, 1.5))
            Line((10, 1.5), (10, 1.75))
        make_face()
    extrude(amount=-F34_T15_DEPTH)

    split(bisect_by=Plane(origin=(0.75, 0, 0.75), x_dir=(0, 1, 0), z_dir=(-0.7071067812, 0, -0.7071067812)), keep=Keep.TOP)


with BuildPart() as f1_5:
    add(f1_4.part)

    # F34_t12: cut F34_tool13
    add(f34_tool13.part, mode=Mode.SUBTRACT)

    # F34_s17 → F34_t18 (revolve, cut)
    with BuildSketch(Plane.YZ.offset(-2)):
        with BuildLine():
            ThreePointArc((7, 3.25), (7.0732233047, 3.4267766953), (7.25, 3.5))
            Line((7.25, 3.5), (7, 3.5))
            Line((7, 3.5), (7, 3.25))
        make_face()
    revolve(axis=Axis((-2, 7, 2.5), (0, -1, 0)), revolution_arc=F34_T18_ANGLE, mode=Mode.SUBTRACT)


with BuildPart() as f34_tool20:
    # F34_s21 → F34_t22 (new body)
    with BuildSketch(Plane.YZ):
        with BuildLine():
            ThreePointArc((7, 1.75), (7.0732233047, 1.5732233047), (7.25, 1.5))
            Line((7.25, 1.5), (7, 1.5))
            Line((7, 1.5), (7, 1.75))
        make_face()
    extrude(amount=-F34_T22_DEPTH)

    split(bisect_by=Plane(origin=(0.75, 0, 0.75), x_dir=(0, 1, 0), z_dir=(0.7071067812, 0, 0.7071067812)), keep=Keep.TOP)


with BuildPart() as f1_6:
    add(f1_5.part)

    # F34_t19: cut F34_tool20
    add(f34_tool20.part, mode=Mode.SUBTRACT)


with BuildPart() as f34_tool25:
    # F34_s26 → F34_t27 (new body)
    with BuildSketch(Plane.YZ):
        with BuildLine():
            ThreePointArc((7, 1.75), (7.0732233047, 1.5732233047), (7.25, 1.5))
            Line((7.25, 1.5), (7, 1.5))
            Line((7, 1.5), (7, 1.75))
        make_face()
    extrude(amount=-F34_T27_DEPTH)

    split(bisect_by=Plane(origin=(0.75, 0, 0.75), x_dir=(0, 1, 0), z_dir=(-0.7071067812, 0, -0.7071067812)), keep=Keep.TOP)


with BuildPart() as f1_7:
    add(f1_6.part)

    # F34_t24: cut F34_tool25
    add(f34_tool25.part, mode=Mode.SUBTRACT)

    # F34_s29 → F34_t30 (revolve, cut)
    with BuildSketch(Plane.YZ.offset(-2)):
        with BuildLine():
            ThreePointArc((10, 3.25), (9.9267766953, 3.4267766953), (9.75, 3.5))
            Line((9.75, 3.5), (10, 3.5))
            Line((10, 3.5), (10, 3.25))
        make_face()
    revolve(axis=Axis((-2, 10, 2.5), (0, -1, 0)), revolution_arc=F34_T30_ANGLE, mode=Mode.SUBTRACT)


solid = f1_7.part
